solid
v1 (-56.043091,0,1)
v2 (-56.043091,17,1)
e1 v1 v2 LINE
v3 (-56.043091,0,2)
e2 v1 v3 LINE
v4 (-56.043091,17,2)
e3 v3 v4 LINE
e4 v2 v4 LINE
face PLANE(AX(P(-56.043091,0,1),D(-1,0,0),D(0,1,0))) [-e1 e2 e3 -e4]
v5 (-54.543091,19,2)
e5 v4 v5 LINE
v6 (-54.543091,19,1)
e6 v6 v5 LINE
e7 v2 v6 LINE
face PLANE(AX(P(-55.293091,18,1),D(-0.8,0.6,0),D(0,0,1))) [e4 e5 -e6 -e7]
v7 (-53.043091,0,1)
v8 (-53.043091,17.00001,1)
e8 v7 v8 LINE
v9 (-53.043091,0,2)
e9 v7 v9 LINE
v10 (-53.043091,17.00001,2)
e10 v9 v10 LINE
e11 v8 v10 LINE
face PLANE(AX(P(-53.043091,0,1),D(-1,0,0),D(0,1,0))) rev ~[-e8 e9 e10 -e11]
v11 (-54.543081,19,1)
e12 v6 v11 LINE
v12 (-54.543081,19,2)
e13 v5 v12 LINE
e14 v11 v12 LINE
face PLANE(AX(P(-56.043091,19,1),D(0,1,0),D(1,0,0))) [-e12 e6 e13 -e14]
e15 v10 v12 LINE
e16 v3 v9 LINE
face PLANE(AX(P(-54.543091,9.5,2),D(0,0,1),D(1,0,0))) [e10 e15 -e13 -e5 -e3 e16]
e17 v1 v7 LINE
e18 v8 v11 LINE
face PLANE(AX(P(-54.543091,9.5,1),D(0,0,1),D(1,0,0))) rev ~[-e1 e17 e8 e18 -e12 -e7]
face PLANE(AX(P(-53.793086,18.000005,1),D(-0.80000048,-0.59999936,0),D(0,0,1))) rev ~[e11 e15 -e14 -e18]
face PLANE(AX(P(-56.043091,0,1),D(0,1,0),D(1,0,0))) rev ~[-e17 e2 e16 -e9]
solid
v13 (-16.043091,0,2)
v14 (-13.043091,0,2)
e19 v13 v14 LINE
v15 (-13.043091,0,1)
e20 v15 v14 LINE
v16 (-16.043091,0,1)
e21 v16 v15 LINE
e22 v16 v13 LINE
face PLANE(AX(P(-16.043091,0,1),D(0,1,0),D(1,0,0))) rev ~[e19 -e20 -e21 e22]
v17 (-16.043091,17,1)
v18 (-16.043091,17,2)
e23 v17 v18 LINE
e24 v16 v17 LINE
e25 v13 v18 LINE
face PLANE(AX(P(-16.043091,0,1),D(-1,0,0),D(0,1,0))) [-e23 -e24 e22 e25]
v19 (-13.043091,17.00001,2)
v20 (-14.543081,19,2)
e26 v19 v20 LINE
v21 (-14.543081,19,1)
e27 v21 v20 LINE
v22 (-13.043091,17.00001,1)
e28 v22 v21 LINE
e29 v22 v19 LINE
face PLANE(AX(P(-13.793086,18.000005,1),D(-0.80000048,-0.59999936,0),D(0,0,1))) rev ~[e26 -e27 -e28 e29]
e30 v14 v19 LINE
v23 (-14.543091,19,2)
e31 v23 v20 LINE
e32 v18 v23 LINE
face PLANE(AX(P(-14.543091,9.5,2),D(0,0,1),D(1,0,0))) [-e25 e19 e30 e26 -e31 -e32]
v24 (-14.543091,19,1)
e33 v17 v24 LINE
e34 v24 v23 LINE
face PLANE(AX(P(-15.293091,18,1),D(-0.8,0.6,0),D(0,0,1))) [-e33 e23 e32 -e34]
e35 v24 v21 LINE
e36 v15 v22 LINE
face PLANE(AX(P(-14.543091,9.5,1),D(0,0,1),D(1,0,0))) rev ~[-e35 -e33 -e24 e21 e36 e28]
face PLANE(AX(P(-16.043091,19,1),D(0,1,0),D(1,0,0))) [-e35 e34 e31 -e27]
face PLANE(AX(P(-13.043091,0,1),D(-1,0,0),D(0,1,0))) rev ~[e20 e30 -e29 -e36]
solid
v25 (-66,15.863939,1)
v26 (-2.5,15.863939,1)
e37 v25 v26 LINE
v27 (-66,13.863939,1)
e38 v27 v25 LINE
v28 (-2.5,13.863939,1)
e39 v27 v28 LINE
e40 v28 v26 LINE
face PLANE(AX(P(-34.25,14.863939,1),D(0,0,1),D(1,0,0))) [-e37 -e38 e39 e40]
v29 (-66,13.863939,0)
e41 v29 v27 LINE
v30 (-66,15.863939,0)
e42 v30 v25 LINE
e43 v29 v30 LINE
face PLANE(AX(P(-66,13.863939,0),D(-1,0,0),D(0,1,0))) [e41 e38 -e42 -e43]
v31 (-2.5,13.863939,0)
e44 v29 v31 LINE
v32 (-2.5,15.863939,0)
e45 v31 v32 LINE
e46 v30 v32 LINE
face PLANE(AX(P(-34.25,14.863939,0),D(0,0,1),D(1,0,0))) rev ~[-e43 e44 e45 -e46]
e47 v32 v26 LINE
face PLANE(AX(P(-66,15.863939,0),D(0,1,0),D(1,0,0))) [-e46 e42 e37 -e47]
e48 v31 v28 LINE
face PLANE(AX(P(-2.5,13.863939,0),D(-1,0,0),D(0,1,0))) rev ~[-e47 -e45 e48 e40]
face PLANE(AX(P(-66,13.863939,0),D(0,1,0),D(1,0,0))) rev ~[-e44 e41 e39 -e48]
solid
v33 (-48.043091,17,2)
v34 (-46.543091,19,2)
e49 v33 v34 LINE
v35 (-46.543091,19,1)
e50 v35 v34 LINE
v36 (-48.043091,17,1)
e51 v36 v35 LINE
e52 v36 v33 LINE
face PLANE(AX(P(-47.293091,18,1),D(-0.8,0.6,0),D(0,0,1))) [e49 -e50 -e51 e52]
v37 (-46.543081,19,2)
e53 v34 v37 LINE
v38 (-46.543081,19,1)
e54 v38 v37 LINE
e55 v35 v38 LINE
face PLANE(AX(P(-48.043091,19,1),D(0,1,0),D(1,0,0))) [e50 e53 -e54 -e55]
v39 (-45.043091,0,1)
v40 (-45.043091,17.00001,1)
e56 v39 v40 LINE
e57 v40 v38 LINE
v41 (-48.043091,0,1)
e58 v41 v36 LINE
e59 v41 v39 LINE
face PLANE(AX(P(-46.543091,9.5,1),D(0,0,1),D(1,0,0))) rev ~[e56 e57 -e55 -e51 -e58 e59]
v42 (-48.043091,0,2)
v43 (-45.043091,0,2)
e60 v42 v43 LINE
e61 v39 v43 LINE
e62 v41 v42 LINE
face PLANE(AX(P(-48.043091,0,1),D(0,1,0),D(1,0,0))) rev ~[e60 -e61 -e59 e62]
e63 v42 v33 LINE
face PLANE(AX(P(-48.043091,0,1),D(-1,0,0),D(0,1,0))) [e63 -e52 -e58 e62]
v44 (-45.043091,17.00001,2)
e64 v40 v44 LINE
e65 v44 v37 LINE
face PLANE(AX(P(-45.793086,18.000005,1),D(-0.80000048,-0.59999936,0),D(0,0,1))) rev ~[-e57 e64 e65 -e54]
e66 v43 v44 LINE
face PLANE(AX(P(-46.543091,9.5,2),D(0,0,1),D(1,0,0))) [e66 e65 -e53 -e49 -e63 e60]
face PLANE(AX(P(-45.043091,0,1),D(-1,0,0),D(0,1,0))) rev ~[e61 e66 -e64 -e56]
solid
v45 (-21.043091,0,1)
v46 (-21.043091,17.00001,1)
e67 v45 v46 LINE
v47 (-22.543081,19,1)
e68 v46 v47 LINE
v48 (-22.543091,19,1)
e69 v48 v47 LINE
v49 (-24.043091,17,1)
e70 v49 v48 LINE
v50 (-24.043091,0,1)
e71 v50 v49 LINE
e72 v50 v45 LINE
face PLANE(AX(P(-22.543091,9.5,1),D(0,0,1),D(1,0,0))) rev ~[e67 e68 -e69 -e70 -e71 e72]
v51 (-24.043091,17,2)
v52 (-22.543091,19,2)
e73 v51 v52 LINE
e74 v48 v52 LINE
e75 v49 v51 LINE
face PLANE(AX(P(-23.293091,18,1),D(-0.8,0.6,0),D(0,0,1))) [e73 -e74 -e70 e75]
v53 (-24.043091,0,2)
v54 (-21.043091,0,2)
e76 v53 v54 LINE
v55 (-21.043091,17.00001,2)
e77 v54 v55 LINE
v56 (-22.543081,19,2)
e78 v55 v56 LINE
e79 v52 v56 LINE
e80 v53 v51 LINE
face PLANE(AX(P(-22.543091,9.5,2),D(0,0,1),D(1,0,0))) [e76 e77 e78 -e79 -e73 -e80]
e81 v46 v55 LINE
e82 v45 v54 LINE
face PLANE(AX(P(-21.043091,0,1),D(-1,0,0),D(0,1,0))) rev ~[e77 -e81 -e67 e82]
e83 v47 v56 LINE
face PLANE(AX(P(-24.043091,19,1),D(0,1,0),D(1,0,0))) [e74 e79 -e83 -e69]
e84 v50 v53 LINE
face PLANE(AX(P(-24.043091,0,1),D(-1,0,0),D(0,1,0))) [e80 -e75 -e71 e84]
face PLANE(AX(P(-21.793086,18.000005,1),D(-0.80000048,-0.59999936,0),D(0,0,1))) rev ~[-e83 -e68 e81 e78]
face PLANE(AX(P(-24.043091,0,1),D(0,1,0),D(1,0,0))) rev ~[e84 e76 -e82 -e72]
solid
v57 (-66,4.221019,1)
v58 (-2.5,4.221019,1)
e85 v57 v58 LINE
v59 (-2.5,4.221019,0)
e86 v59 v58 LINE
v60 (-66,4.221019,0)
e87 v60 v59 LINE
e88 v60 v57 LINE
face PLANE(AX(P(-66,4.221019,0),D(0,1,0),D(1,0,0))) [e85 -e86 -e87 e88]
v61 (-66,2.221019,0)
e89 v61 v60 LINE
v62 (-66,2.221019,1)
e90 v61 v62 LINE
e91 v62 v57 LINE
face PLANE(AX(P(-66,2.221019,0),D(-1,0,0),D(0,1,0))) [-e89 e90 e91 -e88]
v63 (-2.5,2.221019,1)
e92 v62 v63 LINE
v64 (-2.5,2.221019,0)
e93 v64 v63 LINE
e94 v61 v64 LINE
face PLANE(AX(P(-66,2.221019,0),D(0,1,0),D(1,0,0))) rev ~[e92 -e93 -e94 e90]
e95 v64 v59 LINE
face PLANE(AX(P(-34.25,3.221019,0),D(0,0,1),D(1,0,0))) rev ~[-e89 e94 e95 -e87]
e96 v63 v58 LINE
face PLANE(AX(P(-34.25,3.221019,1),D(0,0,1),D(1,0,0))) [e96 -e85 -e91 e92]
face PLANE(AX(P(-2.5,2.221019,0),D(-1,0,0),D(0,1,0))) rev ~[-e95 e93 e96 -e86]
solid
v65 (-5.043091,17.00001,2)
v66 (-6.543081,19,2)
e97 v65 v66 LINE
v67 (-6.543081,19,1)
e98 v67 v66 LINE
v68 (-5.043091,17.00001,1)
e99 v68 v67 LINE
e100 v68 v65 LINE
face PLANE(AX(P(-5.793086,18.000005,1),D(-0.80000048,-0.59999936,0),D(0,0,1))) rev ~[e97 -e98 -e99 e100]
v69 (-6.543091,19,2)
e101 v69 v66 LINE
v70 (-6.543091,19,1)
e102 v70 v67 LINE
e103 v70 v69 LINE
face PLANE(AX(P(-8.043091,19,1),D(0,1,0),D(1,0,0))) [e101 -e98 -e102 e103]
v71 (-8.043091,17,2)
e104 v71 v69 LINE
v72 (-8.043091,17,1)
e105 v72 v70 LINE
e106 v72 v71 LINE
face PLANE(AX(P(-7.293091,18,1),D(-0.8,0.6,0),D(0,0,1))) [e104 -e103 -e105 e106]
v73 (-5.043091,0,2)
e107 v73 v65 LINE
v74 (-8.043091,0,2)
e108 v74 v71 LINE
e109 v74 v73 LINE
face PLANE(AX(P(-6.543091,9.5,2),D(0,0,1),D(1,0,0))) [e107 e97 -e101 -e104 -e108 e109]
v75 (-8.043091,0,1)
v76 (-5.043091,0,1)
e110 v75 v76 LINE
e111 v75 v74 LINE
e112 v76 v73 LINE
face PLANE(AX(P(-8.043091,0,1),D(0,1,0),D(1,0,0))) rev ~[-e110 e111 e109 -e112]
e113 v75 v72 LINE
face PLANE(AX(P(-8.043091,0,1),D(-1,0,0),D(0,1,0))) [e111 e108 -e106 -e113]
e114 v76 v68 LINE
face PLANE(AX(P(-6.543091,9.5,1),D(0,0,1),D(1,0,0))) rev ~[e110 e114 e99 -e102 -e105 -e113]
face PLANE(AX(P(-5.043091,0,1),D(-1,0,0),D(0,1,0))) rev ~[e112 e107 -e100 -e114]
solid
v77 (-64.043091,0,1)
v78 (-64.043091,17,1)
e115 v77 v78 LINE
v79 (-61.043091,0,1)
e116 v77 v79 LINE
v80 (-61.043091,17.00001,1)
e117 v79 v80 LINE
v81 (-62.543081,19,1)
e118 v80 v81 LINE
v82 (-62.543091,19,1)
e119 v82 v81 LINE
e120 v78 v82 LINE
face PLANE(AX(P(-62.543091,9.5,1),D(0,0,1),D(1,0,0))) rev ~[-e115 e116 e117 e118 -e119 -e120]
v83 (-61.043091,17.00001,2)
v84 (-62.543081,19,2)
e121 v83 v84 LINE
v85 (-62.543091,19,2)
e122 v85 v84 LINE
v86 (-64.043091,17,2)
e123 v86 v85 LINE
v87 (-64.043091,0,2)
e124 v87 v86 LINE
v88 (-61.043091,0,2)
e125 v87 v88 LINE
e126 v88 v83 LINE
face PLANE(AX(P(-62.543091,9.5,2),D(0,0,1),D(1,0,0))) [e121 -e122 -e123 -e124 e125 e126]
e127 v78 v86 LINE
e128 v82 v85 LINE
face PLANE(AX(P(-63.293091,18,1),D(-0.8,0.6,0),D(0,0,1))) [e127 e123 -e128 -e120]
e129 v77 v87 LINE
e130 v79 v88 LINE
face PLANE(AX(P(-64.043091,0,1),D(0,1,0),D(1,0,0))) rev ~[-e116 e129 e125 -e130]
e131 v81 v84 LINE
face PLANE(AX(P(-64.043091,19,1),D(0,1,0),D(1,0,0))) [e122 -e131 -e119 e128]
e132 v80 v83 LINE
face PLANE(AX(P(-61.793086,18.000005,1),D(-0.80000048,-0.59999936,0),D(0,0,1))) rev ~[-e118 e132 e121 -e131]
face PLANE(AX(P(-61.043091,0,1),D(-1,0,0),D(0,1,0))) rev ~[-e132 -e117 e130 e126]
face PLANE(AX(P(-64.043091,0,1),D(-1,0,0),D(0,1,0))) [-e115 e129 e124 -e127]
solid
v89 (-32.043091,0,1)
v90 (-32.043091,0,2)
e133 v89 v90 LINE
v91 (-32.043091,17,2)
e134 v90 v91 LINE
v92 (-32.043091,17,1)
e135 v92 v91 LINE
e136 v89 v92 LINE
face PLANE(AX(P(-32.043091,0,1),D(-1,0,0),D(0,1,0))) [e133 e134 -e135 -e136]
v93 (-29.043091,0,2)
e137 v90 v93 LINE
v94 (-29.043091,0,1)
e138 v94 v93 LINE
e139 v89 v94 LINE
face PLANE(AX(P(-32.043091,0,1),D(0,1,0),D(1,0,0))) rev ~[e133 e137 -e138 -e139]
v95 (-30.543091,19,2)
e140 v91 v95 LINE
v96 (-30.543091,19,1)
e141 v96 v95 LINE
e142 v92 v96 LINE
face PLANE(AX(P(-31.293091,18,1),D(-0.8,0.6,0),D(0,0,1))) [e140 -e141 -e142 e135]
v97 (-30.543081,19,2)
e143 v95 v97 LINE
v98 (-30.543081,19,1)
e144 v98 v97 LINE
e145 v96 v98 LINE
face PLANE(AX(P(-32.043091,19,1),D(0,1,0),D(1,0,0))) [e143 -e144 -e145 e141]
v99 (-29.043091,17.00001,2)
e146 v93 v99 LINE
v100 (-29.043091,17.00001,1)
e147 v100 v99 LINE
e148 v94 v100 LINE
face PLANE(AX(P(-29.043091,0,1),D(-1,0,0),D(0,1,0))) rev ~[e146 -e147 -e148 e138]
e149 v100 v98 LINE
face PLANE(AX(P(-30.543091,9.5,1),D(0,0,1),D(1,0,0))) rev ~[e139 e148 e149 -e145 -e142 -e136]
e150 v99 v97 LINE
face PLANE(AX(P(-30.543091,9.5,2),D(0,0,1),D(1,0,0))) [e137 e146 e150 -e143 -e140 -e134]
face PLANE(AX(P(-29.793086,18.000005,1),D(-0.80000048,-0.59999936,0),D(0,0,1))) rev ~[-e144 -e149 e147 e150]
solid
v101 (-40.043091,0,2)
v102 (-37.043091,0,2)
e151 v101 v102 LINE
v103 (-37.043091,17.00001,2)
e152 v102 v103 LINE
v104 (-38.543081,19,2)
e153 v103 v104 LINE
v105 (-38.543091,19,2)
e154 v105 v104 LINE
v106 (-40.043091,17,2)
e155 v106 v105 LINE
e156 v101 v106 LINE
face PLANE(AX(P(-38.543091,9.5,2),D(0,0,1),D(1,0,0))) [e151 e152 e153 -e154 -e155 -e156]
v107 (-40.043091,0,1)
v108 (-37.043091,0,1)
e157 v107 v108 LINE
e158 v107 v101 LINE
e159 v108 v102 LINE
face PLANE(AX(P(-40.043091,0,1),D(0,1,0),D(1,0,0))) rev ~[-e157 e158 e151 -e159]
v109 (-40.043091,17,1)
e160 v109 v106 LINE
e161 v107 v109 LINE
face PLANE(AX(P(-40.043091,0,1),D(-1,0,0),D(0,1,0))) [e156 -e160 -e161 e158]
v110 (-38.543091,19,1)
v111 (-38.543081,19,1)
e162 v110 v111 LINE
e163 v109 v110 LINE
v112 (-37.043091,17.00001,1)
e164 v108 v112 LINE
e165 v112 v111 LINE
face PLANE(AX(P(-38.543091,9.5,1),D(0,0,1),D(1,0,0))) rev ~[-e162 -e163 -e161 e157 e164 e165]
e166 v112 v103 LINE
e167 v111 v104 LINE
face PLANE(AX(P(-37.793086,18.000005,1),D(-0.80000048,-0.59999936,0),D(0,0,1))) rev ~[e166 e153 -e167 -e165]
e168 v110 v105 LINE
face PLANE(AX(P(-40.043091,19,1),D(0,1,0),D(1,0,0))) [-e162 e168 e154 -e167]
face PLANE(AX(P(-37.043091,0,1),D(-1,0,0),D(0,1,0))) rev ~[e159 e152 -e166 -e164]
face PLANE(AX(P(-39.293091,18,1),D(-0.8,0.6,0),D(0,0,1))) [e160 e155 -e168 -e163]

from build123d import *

# Parameters (mm, degrees)
F1_START    = 1
F0_W        = 3
F0_H        = 19
F1_DEPTH    = 1
F2_W        = 63.5
F2_H        = 2
F3_DEPTH    = 1
F4_SIZE2    = 1.5
F4_SIZE     = 2
F4_2_SIZE2  = 1.49999
F4_2_SIZE   = 1.99999
F4_3_SIZE2  = 1.5
F4_3_SIZE   = 2
F4_4_SIZE2  = 1.49999
F4_4_SIZE   = 1.99999
F4_5_SIZE2  = 1.5
F4_5_SIZE   = 2
F4_6_SIZE2  = 1.49999
F4_6_SIZE   = 1.99999
F4_7_SIZE2  = 1.5
F4_7_SIZE   = 2
F4_8_SIZE2  = 1.49999
F4_8_SIZE   = 1.99999
F4_9_SIZE2  = 1.5
F4_9_SIZE   = 2
F4_10_SIZE2 = 1.49999
F4_10_SIZE  = 1.99999
F4_11_SIZE2 = 1.5
F4_11_SIZE  = 2
F4_12_SIZE2 = 1.49999
F4_12_SIZE  = 1.99999
F4_13_SIZE2 = 1.5
F4_13_SIZE  = 2
F4_14_SIZE2 = 1.49999
F4_14_SIZE  = 1.99999
F4_15_SIZE2 = 1.5
F4_15_SIZE  = 2
F4_16_SIZE2 = 1.49999
F4_16_SIZE  = 1.99999


# Not quite as in the source:
# - a fillet or chamfer is up to 0.001 mm smaller than in the source, because OpenCascade refuses the exact size


with BuildPart() as f1:
    # F0 (on Top) → F1 (new body)
    with BuildSketch(Plane.XY.offset(F1_START)):
        with Locations((-62.5430910557, 9.5)):
            Rectangle(F0_W, F0_H)
    extrude(amount=F1_DEPTH)

    # F4
    f4_edges = [f1.edges().sort_by_distance(p)[0] for p in [
        (-64.043091, 19, 1.5),
    ]]
    f4_side = f1.faces().sort_by_distance((-64.043091, 9.5, 1.5))[0]
    chamfer(f4_edges, length=F4_SIZE, length2=F4_SIZE2, reference=f4_side)

    # F4#2 (size 2 and 1.5 in the source; OpenCascade refuses exactly that, so slightly less here)
    f4_2_edges = [f1.edges().sort_by_distance(p)[0] for p in [
        (-61.043091, 19, 1.5),
    ]]
    f4_2_side = f1.faces().sort_by_distance((-61.043091, 9.5, 1.5))[0]
    chamfer(f4_2_edges, length=F4_2_SIZE, length2=F4_2_SIZE2, reference=f4_2_side)


with BuildPart() as f1b:
    # F0 (on Top) → F1, piece 2 (new body)
    with BuildSketch(Plane.XY.offset(F1_START)):
        with Locations((-54.5430910557, 9.5)):
            Rectangle(F0_W, F0_H)
    extrude(amount=F1_DEPTH)

    # F4#3
    f4_3_edges = [f1b.edges().sort_by_distance(p)[0] for p in [
        (-56.043091, 19, 1.5),
    ]]
    f4_3_side = f1b.faces().sort_by_distance((-56.043091, 9.5, 1.5))[0]
    chamfer(f4_3_edges, length=F4_3_SIZE, length2=F4_3_SIZE2, reference=f4_3_side)

    # F4#4 (size 2 and 1.5 in the source; OpenCascade refuses exactly that, so slightly less here)
    f4_4_edges = [f1b.edges().sort_by_distance(p)[0] for p in [
        (-53.043091, 19, 1.5),
    ]]
    f4_4_side = f1b.faces().sort_by_distance((-53.043091, 9.5, 1.5))[0]
    chamfer(f4_4_edges, length=F4_4_SIZE, length2=F4_4_SIZE2, reference=f4_4_side)


with BuildPart() as f1c:
    # F0 (on Top) → F1, piece 3 (new body)
    with BuildSketch(Plane.XY.offset(F1_START)):
        with Locations((-46.5430910557, 9.5)):
            Rectangle(F0_W, F0_H)
    extrude(amount=F1_DEPTH)

    # F4#5
    f4_5_edges = [f1c.edges().sort_by_distance(p)[0] for p in [
        (-48.043091, 19, 1.5),
    ]]
    f4_5_side = f1c.faces().sort_by_distance((-48.043091, 9.5, 1.5))[0]
    chamfer(f4_5_edges, length=F4_5_SIZE, length2=F4_5_SIZE2, reference=f4_5_side)

    # F4#6 (size 2 and 1.5 in the source; OpenCascade refuses exactly that, so slightly less here)
    f4_6_edges = [f1c.edges().sort_by_distance(p)[0] for p in [
        (-45.043091, 19, 1.5),
    ]]
    f4_6_side = f1c.faces().sort_by_distance((-45.043091, 9.5, 1.5))[0]
    chamfer(f4_6_edges, length=F4_6_SIZE, length2=F4_6_SIZE2, reference=f4_6_side)


with BuildPart() as f1d:
    # F0 (on Top) → F1, piece 4 (new body)
    with BuildSketch(Plane.XY.offset(F1_START)):
        with Locations((-38.5430910557, 9.5)):
            Rectangle(F0_W, F0_H)
    extrude(amount=F1_DEPTH)

    # F4#7
    f4_7_edges = [f1d.edges().sort_by_distance(p)[0] for p in [
        (-40.043091, 19, 1.5),
    ]]
    f4_7_side = f1d.faces().sort_by_distance((-40.043091, 9.5, 1.5))[0]
    chamfer(f4_7_edges, length=F4_7_SIZE, length2=F4_7_SIZE2, reference=f4_7_side)

    # F4#8 (size 2 and 1.5 in the source; OpenCascade refuses exactly that, so slightly less here)
    f4_8_edges = [f1d.edges().sort_by_distance(p)[0] for p in [
        (-37.043091, 19, 1.5),
    ]]
    f4_8_side = f1d.faces().sort_by_distance((-37.043091, 9.5, 1.5))[0]
    chamfer(f4_8_edges, length=F4_8_SIZE, length2=F4_8_SIZE2, reference=f4_8_side)


with BuildPart() as f1e:
    # F0 (on Top) → F1, piece 5 (new body)
    with BuildSketch(Plane.XY.offset(F1_START)):
        with Locations((-30.5430910557, 9.5)):
            Rectangle(F0_W, F0_H)
    extrude(amount=F1_DEPTH)

    # F4#9
    f4_9_edges = [f1e.edges().sort_by_distance(p)[0] for p in [
        (-32.043091, 19, 1.5),
    ]]
    f4_9_side = f1e.faces().sort_by_distance((-32.043091, 9.5, 1.5))[0]
    chamfer(f4_9_edges, length=F4_9_SIZE, length2=F4_9_SIZE2, reference=f4_9_side)

    # F4#10 (size 2 and 1.5 in the source; OpenCascade refuses exactly that, so slightly less here)
    f4_10_edges = [f1e.edges().sort_by_distance(p)[0] for p in [
        (-29.043091, 19, 1.5),
    ]]
    f4_10_side = f1e.faces().sort_by_distance((-29.043091, 9.5, 1.5))[0]
    chamfer(f4_10_edges, length=F4_10_SIZE, length2=F4_10_SIZE2, reference=f4_10_side)


with BuildPart() as f1f:
    # F0 (on Top) → F1, piece 6 (new body)
    with BuildSketch(Plane.XY.offset(F1_START)):
        with Locations((-22.5430910557, 9.5)):
            Rectangle(F0_W, F0_H)
    extrude(amount=F1_DEPTH)

    # F4#15
    f4_15_edges = [f1f.edges().sort_by_distance(p)[0] for p in [
        (-24.043091, 19, 1.5),
    ]]
    f4_15_side = f1f.faces().sort_by_distance((-24.043091, 9.5, 1.5))[0]
    chamfer(f4_15_edges, length=F4_15_SIZE, length2=F4_15_SIZE2, reference=f4_15_side)

    # F4#16 (size 2 and 1.5 in the source; OpenCascade refuses exactly that, so slightly less here)
    f4_16_edges = [f1f.edges().sort_by_distance(p)[0] for p in [
        (-21.043091, 19, 1.5),
    ]]
    f4_16_side = f1f.faces().sort_by_distance((-21.043091, 9.5, 1.5))[0]
    chamfer(f4_16_edges, length=F4_16_SIZE, length2=F4_16_SIZE2, reference=f4_16_side)


with BuildPart() as f1g:
    # F0 (on Top) → F1, piece 7 (new body)
    with BuildSketch(Plane.XY.offset(F1_START)):
        with Locations((-14.5430910557, 9.5)):
            Rectangle(F0_W, F0_H)
    extrude(amount=F1_DEPTH)

    # F4#11
    f4_11_edges = [f1g.edges().sort_by_distance(p)[0] for p in [
        (-16.043091, 19, 1.5),
    ]]
    f4_11_side = f1g.faces().sort_by_distance((-16.043091, 9.5, 1.5))[0]
    chamfer(f4_11_edges, length=F4_11_SIZE, length2=F4_11_SIZE2, reference=f4_11_side)

    # F4#12 (size 2 and 1.5 in the source; OpenCascade refuses exactly that, so slightly less here)
    f4_12_edges = [f1g.edges().sort_by_distance(p)[0] for p in [
        (-13.043091, 19, 1.5),
    ]]
    f4_12_side = f1g.faces().sort_by_distance((-13.043091, 9.5, 1.5))[0]
    chamfer(f4_12_edges, length=F4_12_SIZE, length2=F4_12_SIZE2, reference=f4_12_side)


with BuildPart() as f1h:
    # F0 (on Top) → F1, piece 8 (new body)
    with BuildSketch(Plane.XY.offset(F1_START)):
        with Locations((-6.5430910557, 9.5)):
            Rectangle(F0_W, F0_H)
    extrude(amount=F1_DEPTH)

    # F4#13
    f4_13_edges = [f1h.edges().sort_by_distance(p)[0] for p in [
        (-8.043091, 19, 1.5),
    ]]
    f4_13_side = f1h.faces().sort_by_distance((-8.043091, 9.5, 1.5))[0]
    chamfer(f4_13_edges, length=F4_13_SIZE, length2=F4_13_SIZE2, reference=f4_13_side)

    # F4#14 (size 2 and 1.5 in the source; OpenCascade refuses exactly that, so slightly less here)
    f4_14_edges = [f1h.edges().sort_by_distance(p)[0] for p in [
        (-5.043091, 19, 1.5),
    ]]
    f4_14_side = f1h.faces().sort_by_distance((-5.043091, 9.5, 1.5))[0]
    chamfer(f4_14_edges, length=F4_14_SIZE, length2=F4_14_SIZE2, reference=f4_14_side)


with BuildPart() as f3:
    # F2 (on Top) → F3 (new body)
    with BuildSketch(Plane.XY):
        with Locations((-34.25, 14.8639390082)):
            Rectangle(F2_W, F2_H)
    extrude(amount=F3_DEPTH)


with BuildPart() as f3b:
    # F2 (on Top) → F3, piece 2 (new body)
    with BuildSketch(Plane.XY):
        with Locations((-34.25, 3.2210190073)):
            Rectangle(F2_W, F2_H)
    extrude(amount=F3_DEPTH)


solid = Compound([f1.part, f1b.part, f1c.part, f1d.part, f1e.part, f1f.part, f1g.part, f1h.part, f3.part, f3b.part])
